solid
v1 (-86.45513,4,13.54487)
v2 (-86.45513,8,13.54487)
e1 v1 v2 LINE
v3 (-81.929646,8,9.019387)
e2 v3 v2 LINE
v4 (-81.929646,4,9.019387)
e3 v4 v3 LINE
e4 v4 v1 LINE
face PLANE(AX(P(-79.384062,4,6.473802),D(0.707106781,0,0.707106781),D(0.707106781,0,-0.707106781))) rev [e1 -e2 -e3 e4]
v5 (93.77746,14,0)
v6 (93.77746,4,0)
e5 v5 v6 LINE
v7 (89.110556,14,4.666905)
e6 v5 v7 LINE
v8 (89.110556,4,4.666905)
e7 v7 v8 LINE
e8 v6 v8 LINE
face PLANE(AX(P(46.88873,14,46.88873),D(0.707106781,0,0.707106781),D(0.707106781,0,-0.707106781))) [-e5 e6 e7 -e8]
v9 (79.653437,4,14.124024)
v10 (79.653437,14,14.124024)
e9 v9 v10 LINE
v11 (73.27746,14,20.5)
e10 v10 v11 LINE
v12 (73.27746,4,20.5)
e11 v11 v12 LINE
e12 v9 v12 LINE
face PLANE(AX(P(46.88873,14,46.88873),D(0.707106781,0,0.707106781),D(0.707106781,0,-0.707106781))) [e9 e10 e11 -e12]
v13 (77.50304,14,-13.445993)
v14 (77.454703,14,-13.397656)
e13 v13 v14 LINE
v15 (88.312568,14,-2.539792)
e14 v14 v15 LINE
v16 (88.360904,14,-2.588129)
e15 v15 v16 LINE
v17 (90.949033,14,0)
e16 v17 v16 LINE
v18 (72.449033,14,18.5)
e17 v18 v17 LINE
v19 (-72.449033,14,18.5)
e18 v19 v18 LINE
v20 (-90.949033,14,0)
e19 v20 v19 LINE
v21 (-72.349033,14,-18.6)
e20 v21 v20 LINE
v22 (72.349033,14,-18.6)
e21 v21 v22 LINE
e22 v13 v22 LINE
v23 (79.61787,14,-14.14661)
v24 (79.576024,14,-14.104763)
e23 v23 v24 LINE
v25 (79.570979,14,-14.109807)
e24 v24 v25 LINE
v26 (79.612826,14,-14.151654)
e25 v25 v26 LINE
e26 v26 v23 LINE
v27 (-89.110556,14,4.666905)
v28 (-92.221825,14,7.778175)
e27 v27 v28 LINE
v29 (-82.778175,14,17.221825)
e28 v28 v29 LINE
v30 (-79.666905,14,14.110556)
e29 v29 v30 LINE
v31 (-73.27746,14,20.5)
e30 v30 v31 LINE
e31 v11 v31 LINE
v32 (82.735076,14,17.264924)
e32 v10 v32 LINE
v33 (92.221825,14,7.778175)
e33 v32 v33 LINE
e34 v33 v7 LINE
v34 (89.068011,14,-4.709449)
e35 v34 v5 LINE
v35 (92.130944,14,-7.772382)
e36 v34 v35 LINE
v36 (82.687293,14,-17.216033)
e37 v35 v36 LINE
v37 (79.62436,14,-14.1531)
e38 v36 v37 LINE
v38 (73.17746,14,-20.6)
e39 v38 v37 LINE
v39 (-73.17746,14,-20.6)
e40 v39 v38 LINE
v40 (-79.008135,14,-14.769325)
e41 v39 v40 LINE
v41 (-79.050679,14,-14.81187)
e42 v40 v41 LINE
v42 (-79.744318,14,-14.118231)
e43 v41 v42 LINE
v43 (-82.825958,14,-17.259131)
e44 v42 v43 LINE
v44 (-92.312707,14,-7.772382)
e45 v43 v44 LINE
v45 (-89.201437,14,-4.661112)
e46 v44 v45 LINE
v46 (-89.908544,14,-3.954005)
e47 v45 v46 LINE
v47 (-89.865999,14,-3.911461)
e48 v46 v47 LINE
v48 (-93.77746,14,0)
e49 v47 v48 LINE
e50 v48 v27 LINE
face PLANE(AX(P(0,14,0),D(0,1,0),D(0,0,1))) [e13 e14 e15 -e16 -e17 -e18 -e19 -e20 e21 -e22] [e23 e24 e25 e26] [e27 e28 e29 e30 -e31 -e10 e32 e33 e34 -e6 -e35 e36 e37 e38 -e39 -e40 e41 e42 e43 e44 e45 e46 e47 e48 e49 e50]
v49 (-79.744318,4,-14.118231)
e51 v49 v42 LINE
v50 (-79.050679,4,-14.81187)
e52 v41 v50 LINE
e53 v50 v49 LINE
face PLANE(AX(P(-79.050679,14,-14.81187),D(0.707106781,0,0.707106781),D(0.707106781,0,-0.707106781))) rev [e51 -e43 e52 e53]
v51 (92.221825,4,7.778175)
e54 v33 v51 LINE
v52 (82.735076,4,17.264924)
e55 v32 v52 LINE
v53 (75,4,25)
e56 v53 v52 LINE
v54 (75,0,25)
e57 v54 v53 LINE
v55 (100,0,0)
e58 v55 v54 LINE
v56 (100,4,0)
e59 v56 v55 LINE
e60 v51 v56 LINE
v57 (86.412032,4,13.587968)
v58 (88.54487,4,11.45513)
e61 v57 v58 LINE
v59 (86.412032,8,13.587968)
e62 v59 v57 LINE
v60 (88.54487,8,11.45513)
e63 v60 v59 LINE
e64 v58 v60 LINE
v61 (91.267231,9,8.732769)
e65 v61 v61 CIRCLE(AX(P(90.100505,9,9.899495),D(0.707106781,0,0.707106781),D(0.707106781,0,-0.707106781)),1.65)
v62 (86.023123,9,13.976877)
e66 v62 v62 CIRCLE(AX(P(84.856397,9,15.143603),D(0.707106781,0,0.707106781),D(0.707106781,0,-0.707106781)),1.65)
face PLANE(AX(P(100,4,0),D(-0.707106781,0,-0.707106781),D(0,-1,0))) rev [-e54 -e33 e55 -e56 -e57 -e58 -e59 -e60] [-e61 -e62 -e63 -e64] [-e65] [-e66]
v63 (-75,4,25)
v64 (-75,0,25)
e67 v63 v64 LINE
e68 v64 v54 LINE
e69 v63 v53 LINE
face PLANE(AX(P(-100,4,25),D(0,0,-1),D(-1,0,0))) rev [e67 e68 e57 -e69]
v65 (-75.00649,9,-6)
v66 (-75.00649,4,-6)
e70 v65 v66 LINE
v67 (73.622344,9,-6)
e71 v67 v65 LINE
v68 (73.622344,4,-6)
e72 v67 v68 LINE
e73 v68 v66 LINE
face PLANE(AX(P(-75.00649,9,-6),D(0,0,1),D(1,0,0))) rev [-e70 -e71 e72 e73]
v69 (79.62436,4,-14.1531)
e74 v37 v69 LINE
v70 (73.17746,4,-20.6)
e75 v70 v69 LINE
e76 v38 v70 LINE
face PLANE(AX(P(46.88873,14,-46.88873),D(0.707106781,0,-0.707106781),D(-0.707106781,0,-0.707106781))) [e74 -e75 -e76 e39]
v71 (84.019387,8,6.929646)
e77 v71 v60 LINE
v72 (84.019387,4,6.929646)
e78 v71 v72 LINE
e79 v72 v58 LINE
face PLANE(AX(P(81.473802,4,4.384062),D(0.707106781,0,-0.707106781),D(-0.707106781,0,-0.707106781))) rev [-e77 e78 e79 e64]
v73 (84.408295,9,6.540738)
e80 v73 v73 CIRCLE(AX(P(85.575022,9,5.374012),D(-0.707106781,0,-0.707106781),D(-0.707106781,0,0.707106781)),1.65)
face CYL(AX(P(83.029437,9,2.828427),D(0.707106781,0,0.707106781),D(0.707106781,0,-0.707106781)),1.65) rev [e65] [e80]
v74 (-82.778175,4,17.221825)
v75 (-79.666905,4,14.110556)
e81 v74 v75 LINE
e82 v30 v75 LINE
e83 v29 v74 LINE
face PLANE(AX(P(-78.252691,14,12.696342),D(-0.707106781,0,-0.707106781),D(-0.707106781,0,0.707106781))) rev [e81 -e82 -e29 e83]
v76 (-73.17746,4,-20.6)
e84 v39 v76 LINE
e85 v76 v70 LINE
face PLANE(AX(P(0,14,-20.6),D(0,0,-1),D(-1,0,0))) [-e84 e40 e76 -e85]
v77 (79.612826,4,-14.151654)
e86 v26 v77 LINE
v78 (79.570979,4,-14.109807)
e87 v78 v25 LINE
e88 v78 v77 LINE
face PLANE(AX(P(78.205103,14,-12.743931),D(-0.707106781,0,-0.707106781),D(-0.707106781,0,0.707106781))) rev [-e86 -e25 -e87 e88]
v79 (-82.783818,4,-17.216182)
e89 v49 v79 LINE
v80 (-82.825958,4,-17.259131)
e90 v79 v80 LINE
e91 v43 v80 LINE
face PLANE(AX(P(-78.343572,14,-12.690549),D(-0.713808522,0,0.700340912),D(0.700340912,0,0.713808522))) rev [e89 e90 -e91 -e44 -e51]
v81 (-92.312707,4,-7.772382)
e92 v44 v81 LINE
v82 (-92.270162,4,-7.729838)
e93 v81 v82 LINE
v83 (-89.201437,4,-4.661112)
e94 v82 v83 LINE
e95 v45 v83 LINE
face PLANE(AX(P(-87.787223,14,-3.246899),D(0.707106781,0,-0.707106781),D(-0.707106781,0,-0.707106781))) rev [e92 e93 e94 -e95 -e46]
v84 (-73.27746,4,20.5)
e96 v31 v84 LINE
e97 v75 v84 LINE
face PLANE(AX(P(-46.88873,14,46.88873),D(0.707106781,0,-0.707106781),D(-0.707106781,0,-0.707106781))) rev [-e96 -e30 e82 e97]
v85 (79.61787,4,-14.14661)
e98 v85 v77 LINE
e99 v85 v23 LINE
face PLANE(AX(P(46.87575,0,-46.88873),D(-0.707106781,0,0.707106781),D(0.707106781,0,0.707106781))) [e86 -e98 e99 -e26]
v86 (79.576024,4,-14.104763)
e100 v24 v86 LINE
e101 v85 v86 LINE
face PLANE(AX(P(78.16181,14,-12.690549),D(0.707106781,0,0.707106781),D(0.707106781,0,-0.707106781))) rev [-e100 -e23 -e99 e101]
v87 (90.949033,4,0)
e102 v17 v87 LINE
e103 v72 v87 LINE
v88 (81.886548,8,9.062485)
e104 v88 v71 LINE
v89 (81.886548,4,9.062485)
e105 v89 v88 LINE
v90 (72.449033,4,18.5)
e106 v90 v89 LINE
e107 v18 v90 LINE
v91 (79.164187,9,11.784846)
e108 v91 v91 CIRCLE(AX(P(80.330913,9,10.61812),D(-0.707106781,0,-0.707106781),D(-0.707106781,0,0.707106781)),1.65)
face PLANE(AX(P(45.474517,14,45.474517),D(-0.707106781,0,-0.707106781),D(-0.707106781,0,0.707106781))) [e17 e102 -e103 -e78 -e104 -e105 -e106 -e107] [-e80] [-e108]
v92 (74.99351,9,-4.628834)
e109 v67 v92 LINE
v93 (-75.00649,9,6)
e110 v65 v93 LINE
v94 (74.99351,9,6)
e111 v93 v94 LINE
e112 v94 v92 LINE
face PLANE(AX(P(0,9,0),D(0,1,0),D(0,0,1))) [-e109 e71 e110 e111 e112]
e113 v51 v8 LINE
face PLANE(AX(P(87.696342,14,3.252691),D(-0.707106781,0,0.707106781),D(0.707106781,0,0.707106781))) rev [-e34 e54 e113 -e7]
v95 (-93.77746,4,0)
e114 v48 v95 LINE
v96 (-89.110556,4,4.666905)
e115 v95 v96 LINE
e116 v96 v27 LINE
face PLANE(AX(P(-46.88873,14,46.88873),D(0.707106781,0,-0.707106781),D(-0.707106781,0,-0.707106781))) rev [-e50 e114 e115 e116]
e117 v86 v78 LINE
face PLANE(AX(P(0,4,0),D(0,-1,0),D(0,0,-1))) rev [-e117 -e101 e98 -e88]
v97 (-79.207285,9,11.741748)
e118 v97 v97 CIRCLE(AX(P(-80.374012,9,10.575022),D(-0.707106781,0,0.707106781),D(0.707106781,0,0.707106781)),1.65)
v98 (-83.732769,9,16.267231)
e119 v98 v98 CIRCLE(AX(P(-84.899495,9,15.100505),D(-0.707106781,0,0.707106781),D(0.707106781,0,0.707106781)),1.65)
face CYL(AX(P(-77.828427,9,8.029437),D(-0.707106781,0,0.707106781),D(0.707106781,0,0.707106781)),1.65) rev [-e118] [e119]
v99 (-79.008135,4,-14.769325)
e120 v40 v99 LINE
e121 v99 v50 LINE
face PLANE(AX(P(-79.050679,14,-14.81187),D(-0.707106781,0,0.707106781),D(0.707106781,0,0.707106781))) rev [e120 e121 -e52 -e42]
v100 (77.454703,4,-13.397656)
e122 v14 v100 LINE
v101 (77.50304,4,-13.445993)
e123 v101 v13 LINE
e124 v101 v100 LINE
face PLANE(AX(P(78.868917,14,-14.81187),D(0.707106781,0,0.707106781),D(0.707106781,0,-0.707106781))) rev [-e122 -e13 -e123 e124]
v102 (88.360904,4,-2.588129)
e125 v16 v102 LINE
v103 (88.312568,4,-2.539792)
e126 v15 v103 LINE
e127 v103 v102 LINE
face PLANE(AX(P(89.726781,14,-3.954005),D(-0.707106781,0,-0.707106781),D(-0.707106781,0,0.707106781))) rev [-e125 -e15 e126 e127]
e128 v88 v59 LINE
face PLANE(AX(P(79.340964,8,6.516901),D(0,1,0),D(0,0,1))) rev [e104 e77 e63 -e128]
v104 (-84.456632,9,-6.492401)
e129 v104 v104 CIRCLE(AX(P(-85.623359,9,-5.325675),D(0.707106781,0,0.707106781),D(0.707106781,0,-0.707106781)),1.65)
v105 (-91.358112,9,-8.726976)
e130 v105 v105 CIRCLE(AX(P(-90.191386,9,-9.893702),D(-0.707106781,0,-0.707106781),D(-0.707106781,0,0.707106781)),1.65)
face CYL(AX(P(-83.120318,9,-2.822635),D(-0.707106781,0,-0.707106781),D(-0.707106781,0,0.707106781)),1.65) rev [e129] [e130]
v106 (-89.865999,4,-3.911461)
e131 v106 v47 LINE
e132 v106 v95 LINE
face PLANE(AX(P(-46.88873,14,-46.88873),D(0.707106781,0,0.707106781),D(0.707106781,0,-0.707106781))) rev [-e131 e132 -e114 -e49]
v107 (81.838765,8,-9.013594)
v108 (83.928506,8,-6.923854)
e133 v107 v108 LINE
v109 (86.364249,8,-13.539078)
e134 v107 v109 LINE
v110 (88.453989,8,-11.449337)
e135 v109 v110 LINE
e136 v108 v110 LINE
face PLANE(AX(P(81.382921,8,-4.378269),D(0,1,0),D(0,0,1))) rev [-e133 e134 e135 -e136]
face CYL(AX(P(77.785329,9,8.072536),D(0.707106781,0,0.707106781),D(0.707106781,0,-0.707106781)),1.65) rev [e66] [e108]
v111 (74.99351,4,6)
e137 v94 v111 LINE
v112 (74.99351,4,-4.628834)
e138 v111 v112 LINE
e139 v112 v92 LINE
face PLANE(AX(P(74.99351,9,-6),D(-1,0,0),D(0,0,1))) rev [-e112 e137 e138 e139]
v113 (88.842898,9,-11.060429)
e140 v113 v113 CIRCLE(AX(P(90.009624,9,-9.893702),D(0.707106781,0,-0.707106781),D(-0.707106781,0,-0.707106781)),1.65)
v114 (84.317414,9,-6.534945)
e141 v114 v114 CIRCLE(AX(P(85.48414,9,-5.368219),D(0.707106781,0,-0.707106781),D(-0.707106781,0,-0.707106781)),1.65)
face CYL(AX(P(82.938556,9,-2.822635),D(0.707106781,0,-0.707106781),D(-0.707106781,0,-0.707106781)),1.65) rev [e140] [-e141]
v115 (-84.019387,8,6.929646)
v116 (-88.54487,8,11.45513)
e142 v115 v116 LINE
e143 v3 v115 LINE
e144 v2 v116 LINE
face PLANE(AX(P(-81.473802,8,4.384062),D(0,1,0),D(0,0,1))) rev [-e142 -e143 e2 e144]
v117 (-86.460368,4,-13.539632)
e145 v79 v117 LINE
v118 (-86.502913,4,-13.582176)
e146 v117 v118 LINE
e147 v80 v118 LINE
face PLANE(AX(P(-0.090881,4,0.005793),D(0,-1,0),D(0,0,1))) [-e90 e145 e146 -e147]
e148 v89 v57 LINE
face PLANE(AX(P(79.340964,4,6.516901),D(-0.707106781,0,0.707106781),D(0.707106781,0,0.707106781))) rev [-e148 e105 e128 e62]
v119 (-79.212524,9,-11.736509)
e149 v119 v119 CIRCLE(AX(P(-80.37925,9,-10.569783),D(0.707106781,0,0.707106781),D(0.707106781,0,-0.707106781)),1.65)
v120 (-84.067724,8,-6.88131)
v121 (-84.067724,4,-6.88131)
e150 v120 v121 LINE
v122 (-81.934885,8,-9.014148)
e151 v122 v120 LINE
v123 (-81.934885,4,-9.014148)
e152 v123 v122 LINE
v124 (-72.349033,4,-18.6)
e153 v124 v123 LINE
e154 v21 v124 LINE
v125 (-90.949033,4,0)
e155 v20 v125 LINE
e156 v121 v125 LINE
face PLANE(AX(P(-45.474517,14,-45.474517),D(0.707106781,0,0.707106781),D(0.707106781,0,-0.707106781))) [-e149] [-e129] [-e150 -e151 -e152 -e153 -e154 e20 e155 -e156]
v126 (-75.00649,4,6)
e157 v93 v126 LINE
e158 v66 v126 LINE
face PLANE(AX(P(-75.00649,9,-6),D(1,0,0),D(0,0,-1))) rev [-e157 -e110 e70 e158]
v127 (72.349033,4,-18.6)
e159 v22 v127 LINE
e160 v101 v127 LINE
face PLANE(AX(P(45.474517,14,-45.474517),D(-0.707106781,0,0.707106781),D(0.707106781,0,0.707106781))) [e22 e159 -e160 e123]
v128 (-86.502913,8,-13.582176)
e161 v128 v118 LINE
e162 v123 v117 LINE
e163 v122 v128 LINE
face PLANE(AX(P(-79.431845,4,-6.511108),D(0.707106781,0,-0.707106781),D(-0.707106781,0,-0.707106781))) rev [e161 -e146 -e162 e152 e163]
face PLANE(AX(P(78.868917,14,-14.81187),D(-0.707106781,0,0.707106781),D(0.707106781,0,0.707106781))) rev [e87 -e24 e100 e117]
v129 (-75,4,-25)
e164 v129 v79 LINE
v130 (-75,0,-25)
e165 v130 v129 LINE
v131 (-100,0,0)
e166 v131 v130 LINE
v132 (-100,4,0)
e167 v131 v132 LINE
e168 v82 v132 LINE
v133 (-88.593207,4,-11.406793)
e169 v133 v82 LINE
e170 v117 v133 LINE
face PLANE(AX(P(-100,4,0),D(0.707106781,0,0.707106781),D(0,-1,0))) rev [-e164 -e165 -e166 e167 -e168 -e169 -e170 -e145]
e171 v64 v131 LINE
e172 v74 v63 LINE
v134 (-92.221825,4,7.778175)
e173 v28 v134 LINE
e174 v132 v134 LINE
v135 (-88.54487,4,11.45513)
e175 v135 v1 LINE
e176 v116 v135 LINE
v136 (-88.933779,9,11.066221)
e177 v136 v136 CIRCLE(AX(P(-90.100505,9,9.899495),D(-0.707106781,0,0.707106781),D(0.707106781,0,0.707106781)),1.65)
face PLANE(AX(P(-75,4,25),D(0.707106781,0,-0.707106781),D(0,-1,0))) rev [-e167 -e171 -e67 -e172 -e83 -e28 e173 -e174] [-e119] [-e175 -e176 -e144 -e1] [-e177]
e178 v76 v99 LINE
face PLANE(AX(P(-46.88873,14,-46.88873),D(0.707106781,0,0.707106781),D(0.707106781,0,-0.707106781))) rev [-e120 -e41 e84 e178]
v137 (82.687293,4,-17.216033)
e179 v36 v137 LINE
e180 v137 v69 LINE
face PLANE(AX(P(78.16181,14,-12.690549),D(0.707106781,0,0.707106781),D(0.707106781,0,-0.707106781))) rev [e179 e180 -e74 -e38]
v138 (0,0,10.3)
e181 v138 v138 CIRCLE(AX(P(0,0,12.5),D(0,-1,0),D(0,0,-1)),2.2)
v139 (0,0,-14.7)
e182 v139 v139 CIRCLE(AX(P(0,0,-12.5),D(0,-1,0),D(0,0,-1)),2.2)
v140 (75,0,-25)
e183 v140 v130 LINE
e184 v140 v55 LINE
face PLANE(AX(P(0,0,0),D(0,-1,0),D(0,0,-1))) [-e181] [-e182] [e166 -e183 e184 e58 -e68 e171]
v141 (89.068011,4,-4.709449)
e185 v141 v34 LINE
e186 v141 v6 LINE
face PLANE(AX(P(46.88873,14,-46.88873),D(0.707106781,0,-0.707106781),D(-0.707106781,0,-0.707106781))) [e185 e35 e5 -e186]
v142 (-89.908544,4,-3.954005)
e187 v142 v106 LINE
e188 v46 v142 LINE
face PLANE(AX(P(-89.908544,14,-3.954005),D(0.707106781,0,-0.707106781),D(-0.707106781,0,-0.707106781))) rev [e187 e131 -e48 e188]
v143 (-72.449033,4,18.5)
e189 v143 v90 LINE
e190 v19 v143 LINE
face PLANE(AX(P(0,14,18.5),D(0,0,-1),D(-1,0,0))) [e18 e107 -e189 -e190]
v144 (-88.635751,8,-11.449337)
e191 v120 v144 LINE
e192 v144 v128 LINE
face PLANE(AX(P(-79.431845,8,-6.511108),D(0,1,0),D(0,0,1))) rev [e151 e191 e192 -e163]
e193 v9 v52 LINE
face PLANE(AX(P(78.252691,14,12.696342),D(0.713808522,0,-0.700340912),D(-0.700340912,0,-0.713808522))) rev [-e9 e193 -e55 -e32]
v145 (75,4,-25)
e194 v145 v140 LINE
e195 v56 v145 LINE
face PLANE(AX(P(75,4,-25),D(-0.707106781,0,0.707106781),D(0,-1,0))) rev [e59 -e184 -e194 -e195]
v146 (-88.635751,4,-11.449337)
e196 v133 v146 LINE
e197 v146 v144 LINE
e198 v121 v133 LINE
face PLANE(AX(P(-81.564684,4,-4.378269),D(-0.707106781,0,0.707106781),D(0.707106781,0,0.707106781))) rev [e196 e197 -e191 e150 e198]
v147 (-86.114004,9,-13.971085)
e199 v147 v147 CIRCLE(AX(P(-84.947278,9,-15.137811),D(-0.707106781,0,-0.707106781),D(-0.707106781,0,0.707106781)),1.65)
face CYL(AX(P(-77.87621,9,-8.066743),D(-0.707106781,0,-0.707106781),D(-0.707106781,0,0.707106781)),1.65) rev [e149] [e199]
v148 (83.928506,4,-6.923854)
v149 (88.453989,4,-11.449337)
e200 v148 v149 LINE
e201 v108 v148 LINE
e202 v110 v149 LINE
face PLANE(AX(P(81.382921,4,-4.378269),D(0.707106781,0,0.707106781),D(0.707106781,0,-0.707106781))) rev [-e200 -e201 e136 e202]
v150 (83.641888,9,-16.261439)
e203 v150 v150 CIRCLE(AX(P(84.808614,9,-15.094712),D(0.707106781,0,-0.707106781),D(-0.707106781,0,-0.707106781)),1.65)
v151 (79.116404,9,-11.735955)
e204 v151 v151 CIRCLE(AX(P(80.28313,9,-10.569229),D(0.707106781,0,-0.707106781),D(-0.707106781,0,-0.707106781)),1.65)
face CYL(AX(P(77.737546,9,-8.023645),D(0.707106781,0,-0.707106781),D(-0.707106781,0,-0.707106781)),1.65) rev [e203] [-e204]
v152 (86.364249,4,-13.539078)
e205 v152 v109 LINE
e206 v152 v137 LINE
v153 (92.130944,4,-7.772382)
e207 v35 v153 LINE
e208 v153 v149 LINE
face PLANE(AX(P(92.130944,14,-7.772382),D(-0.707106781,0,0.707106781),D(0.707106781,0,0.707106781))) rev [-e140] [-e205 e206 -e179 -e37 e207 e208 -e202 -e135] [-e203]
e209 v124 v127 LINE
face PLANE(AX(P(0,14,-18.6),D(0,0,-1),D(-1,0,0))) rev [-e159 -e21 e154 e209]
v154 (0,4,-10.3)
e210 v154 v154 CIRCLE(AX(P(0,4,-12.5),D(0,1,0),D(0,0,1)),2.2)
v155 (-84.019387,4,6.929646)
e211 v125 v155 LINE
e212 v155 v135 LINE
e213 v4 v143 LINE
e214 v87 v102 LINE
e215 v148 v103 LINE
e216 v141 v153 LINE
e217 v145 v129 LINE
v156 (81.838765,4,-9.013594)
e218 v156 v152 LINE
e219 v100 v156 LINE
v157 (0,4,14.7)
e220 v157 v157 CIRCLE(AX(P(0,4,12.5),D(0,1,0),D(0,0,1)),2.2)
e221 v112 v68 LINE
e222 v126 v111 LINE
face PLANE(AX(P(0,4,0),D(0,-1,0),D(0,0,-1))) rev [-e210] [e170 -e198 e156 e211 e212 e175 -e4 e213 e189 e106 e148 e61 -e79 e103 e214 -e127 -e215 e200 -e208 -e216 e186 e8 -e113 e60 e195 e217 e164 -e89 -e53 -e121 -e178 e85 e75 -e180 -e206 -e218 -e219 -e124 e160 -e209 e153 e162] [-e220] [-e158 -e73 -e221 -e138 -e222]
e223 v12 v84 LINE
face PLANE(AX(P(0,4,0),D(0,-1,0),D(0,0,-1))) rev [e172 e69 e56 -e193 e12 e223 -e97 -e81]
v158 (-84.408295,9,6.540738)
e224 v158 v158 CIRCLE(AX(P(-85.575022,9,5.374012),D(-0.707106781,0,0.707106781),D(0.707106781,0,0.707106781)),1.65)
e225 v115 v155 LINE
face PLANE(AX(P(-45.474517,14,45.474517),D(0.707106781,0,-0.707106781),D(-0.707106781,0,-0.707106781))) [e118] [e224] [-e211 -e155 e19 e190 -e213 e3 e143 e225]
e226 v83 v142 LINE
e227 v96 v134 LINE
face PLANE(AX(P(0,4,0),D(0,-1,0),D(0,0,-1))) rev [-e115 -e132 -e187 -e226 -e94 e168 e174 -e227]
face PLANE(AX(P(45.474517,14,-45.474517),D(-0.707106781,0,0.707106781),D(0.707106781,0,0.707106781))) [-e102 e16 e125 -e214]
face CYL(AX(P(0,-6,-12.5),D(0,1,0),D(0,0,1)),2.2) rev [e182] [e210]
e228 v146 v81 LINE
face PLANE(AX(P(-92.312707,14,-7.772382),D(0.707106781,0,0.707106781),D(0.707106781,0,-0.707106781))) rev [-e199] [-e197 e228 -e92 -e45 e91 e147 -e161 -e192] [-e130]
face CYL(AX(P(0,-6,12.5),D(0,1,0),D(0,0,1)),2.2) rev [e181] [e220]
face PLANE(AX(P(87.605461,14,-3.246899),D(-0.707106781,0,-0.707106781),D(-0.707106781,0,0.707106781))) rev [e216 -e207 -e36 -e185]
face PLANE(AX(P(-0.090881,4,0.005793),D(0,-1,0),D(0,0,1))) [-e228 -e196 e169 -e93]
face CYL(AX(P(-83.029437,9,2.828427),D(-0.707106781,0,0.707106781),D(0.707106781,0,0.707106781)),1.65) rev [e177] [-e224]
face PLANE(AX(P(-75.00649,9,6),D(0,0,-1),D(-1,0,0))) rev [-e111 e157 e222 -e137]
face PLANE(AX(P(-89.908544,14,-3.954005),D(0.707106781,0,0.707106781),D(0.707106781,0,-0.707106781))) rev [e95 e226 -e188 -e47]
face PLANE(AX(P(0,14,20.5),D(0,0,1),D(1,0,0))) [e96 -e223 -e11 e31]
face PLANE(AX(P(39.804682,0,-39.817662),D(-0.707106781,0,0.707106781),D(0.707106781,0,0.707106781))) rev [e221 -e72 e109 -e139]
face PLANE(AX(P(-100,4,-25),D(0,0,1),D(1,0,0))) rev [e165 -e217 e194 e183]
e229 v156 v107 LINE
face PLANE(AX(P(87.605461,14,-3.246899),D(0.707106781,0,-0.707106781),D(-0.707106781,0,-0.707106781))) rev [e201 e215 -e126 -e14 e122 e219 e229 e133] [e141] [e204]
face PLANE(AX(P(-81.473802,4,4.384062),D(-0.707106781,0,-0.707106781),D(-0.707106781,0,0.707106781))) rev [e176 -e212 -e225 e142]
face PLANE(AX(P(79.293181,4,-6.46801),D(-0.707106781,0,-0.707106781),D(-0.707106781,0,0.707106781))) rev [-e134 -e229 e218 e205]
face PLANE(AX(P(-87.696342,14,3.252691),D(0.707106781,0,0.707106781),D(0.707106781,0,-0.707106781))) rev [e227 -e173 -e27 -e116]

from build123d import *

# Parameters (mm, degrees)
SKIZZE1_W                       = 200
SKIZZE1_H                       = 50
AUFSATZ_LINEAR_AUSTRAGEN1_DEPTH = 4
FASE1_SIZE                      = 25
AUFSATZ_LINEAR_AUSTRAGEN2_DEPTH = 10
SKIZZE3_W                       = 15.35533906
SKIZZE3_H                       = 10
SCHNITT_LINEAR_AUSTRAGEN1_DEPTH = 10
SKIZZE4_W                       = 15.35533906
SKIZZE4_H                       = 10
SCHNITT_LINEAR_AUSTRAGEN2_DEPTH = 10
SKIZZE5_W                       = 150
SKIZZE5_H                       = 12
AUFSATZ_LINEAR_AUSTRAGEN3_DEPTH = 5
AUFSATZ_LINEAR_AUSTRAGEN4_DEPTH = 10
AUFSATZ_LINEAR_AUSTRAGEN5_DEPTH = 10
SKIZZE11_R                      = 1.65
SKIZZE11_W                      = 2.95533906
SKIZZE11_H                      = 4
SCHNITT_LINEAR_AUSTRAGEN7_DEPTH = 10
SKIZZE12_R                      = 2.2
SCHNITT_LINEAR_AUSTRAGEN8_DEPTH = 10
AUFSATZ_LINEAR_AUSTRAGEN6_DEPTH = 10
SKIZZE8_R                       = 1.65
SKIZZE8_W                       = 3.016289267
SKIZZE8_H                       = 4
SCHNITT_LINEAR_AUSTRAGEN9_DEPTH = 10
KREISMUSTER1_START              = 56.301499416
KREISMUSTER1_OUTLINE_R          = 1.65
KREISMUSTER1_DEPTH              = 0.969560509
KREISMUSTER1_START_2            = 64.310678119
KREISMUSTER1_2_OUTLINE_W        = 0.949011964
KREISMUSTER1_2_OUTLINE_H        = 10
KREISMUSTER1_2_OUTLINE_R        = 1.65
KREISMUSTER1_2_OUTLINE_W_2      = 1.050988037
KREISMUSTER1_2_OUTLINE_W_3      = 2.955339059
KREISMUSTER1_2_OUTLINE_H_2      = 4
KREISMUSTER1_2_DEPTH            = 1.990821297
KREISMUSTER1_START_3            = 66.301499416
KREISMUSTER1_3_OUTLINE_R        = 1.65
KREISMUSTER1_3_OUTLINE_W        = 2.955339059
KREISMUSTER1_3_OUTLINE_H        = 4
KREISMUSTER1_3_DEPTH            = 0.009178703
KREISMUSTER1_START_4            = 64.242319383
KREISMUSTER1_4_OUTLINE_R        = 1.65
KREISMUSTER1_4_DEPTH            = 6.4
AUFSATZ_LINEAR_AUSTRAGEN7_DEPTH = 10
KREISMUSTER2_COUNT              = 2


# Read off the part's stored shape, not the designer's step: Kreismuster1
with BuildPart() as part:
    # Skizze1 → Aufsatz-Linear austragen1 (new body)
    with BuildSketch(Plane(origin=(0, 0, 0), x_dir=(1, 0, 0), z_dir=(0, 1, 0))):
        Rectangle(SKIZZE1_W, SKIZZE1_H)
    extrude(amount=AUFSATZ_LINEAR_AUSTRAGEN1_DEPTH)

    # Fase1
    fase1_edges = [part.edges().sort_by_distance(p)[0] for p in [
        (-100, 2, -25),
        (-100, 2, 25),
        (100, 2, -25),
        (100, 2, 25),
    ]]
    chamfer(fase1_edges, length=FASE1_SIZE - 0.0001)  # a hair under: the kernel refuses the full size

    # Skizze2 → Aufsatz-Linear austragen2 (add)
    with BuildSketch(Plane(origin=(0, 4, 0), x_dir=(1, 0, 0), z_dir=(0, 1, 0))):
        Polygon((-73.177460326, 20.6), (-93.777460326, 0), (-73.277460326, -20.5), (73.277460326, -20.5), (93.777460326, 0), (73.177460326, 20.6), align=None)
        Polygon((90.949033201, 0), (72.349033201, 18.6), (-72.349033201, 18.6), (-90.949033201, 0), (-72.449033201, -18.5), (72.449033201, -18.5), align=None, mode=Mode.SUBTRACT)
    extrude(amount=AUFSATZ_LINEAR_AUSTRAGEN2_DEPTH)

    # Skizze3 → Schnitt-Linear austragen1 (cut)
    with BuildSketch(Plane(origin=(-46.888730163, 0, 46.888730163), x_dir=(0.7071067811865476, 0, 0.7071067811865476), z_dir=(-0.7071067811865476, 0, 0.7071067811865476))):
        with Locations((-53.033008589, 9)):
            Rectangle(SKIZZE3_W, SKIZZE3_H)
    extrude(amount=-SCHNITT_LINEAR_AUSTRAGEN1_DEPTH, mode=Mode.SUBTRACT)

    # Skizze4 → Schnitt-Linear austragen2 (cut)
    with BuildSketch(Plane(origin=(46.888730163, 0, 46.888730163), x_dir=(0.7071067811865475, 0, -0.7071067811865477), z_dir=(0.7071067811865477, 0, 0.7071067811865475))):
        with Locations((53.033008589, 9)):
            Rectangle(SKIZZE4_W, SKIZZE4_H)
    extrude(amount=-SCHNITT_LINEAR_AUSTRAGEN2_DEPTH, mode=Mode.SUBTRACT)

    # Skizze5 → Aufsatz-Linear austragen3 (add)
    with BuildSketch(Plane(origin=(0, 4, 0), x_dir=(1, 0, 0), z_dir=(0, 1, 0))):
        with Locations((-0.006490323, 0)):
            Rectangle(SKIZZE5_W, SKIZZE5_H)
    extrude(amount=AUFSATZ_LINEAR_AUSTRAGEN3_DEPTH)

    # Skizze6 → Aufsatz-Linear austragen4 (add)
    with BuildSketch(Plane(origin=(0, 4, 0), x_dir=(1, 0, 0), z_dir=(0, 1, 0))):
        Polygon((87.696342007, -3.252691193), (78.252691193, -12.696342007), (82.735076288, -17.264923712), (92.221825407, -7.778174593), align=None)
    aufsatz_linear_austragen4 = extrude(amount=AUFSATZ_LINEAR_AUSTRAGEN4_DEPTH)

    # Skizze10 → Aufsatz-Linear austragen5 (add)
    with BuildSketch(Plane(origin=(0, 4, 0), x_dir=(1, 0, 0), z_dir=(0, 1, 0))):
        Polygon((-87.696342007, -3.252691193), (-78.252691193, -12.696342007), (-82.778174593, -17.221825407), (-92.221825407, -7.778174593), align=None)
    extrude(amount=AUFSATZ_LINEAR_AUSTRAGEN5_DEPTH)

    # Skizze11 → Schnitt-Linear austragen7 (cut)
    with BuildSketch(Plane(origin=(-50, 0, 50), x_dir=(0.7071067811865465, 0, 0.7071067811865488), z_dir=(-0.7071067811865488, 0, 0.7071067811865465))):
        with Locations((-56.710678119, 9)):
            Circle(SKIZZE11_R)
        with Locations((-49.355339059, 9)):
            Circle(SKIZZE11_R)
        with Locations((-53.033008589, 6)):
            Rectangle(SKIZZE11_W, SKIZZE11_H)
    extrude(amount=-SCHNITT_LINEAR_AUSTRAGEN7_DEPTH, mode=Mode.SUBTRACT)

    # Skizze12 → Schnitt-Linear austragen8 (cut)
    with BuildSketch(Plane(origin=(0, 4, 0), x_dir=(1, 0, 0), z_dir=(0, 1, 0))):
        with Locations(Location((0, 12.5, 0), (0, 0, 270))):
            Circle(SKIZZE12_R)
        with Locations(Location((0, -12.5, 0), (0, 0, 270))):
            Circle(SKIZZE12_R)
    extrude(amount=-SCHNITT_LINEAR_AUSTRAGEN8_DEPTH, mode=Mode.SUBTRACT)

    # Skizze13 → Aufsatz-Linear austragen6 (add)
    with BuildSketch(Plane(origin=(0, 4, 0), x_dir=(1, 0, 0), z_dir=(0, 1, 0))):
        Polygon((89.817662351, -3.959797975), (88.403448789, -2.545584412), (87.69285367, -3.256179531), (89.107067232, -4.670393094), align=None)
        Polygon((-89.817662351, -3.959797975), (-88.403448789, -2.545584412), (-87.689553601, -3.2594796), (-89.103767163, -4.673693162), align=None)
        Polygon((78.959797975, -14.817662351), (77.545584412, -13.403448789), (78.257117259, -12.691915942), (79.671330821, -14.106129505), align=None)
        Polygon((-78.959797975, -14.817662351), (-77.545584412, -13.403448789), (-78.262212477, -12.686820723), (-79.67642604, -14.101034286), align=None)
    aufsatz_linear_austragen6 = extrude(amount=AUFSATZ_LINEAR_AUSTRAGEN6_DEPTH)

    # Skizze8 → Schnitt-Linear austragen9 (cut)
    with BuildSketch(Plane(origin=(50, 0, 50), x_dir=(0.7071067811865488, 0, -0.7071067811865465), z_dir=(0.7071067811865465, 0, 0.7071067811865488))):
        with Locations((49.294388852, 9)):
            Circle(SKIZZE8_R)
        with Locations((56.710678119, 9)):
            Circle(SKIZZE8_R)
        with Locations((53.002533486, 6)):
            Rectangle(SKIZZE8_W, SKIZZE8_H)
    schnitt_linear_austragen9 = extrude(amount=-SCHNITT_LINEAR_AUSTRAGEN9_DEPTH, mode=Mode.SUBTRACT)

    # Kreismuster1 outline → Kreismuster1 (cut)
    with BuildSketch(Plane(origin=(0, 0, 0), x_dir=(0.707106781186546, 0, 0.707106781186549), z_dir=(0.707106781186549, 0, -0.707106781186546)).offset(KREISMUSTER1_START)):
        Polygon((46.29517232, -9), (46.29517232, -14), (59.650511379, -14), (59.650511379, -4), (54.450511379, -4), (54.450511379, -8), (51.49517232, -8), (51.49517232, -4), (46.29517232, -4), align=None)
        with BuildLine():
            Line((47.64517232, -9), (50.94517232, -9))
            ThreePointArc((50.94517232, -9), (49.29517232, -10.65), (47.64517232, -9))
        make_face(mode=Mode.SUBTRACT)
        with Locations((56.650511379, -9)):
            Circle(KREISMUSTER1_OUTLINE_R, mode=Mode.SUBTRACT)
    extrude(amount=KREISMUSTER1_DEPTH, mode=Mode.SUBTRACT)

    # Kreismuster1 2 outline → Kreismuster1 2 (cut)
    with BuildSketch(Plane(origin=(0, 0, 0), x_dir=(0.707106781186546, 0, 0.707106781186549), z_dir=(0.707106781186549, 0, -0.707106781186546)).offset(KREISMUSTER1_START_2)):
        with Locations((45.820666338, -9)):
            Rectangle(KREISMUSTER1_2_OUTLINE_W, KREISMUSTER1_2_OUTLINE_H)
        with Locations((56.650511379, -9)):
            Circle(KREISMUSTER1_2_OUTLINE_R)
        with Locations((49.29517232, -9)):
            Circle(KREISMUSTER1_2_OUTLINE_R)
        with Locations((60.176005398, -9)):
            Rectangle(KREISMUSTER1_2_OUTLINE_W_2, KREISMUSTER1_2_OUTLINE_H)
        with Locations((52.972841849, -6)):
            Rectangle(KREISMUSTER1_2_OUTLINE_W_3, KREISMUSTER1_2_OUTLINE_H_2)
    extrude(amount=KREISMUSTER1_2_DEPTH, mode=Mode.SUBTRACT)

    # Kreismuster1 3 outline → Kreismuster1 3 (cut)
    with BuildSketch(Plane(origin=(0, 0, 0), x_dir=(0.707106781186546, 0, 0.707106781186549), z_dir=(0.707106781186549, 0, -0.707106781186546)).offset(KREISMUSTER1_START_3)):
        with Locations((56.650511379, -9)):
            Circle(KREISMUSTER1_3_OUTLINE_R)
        with Locations((49.29517232, -9)):
            Circle(KREISMUSTER1_3_OUTLINE_R)
        with Locations((52.972841849, -6)):
            Rectangle(KREISMUSTER1_3_OUTLINE_W, KREISMUSTER1_3_OUTLINE_H)
    extrude(amount=KREISMUSTER1_3_DEPTH, mode=Mode.SUBTRACT)

    # Kreismuster1 4 outline → Kreismuster1 4 (add)
    with BuildSketch(Plane(origin=(0, 0, 0), x_dir=(0.707106781186546, 0, 0.707106781186549), z_dir=(0.707106781186549, 0, -0.707106781186546)).offset(KREISMUSTER1_START_4)):
        Polygon((46.29517232, -9), (46.29517232, -14), (59.650511379, -14), (59.650511379, -4), (54.450511379, -4), (54.450511379, -8), (51.49517232, -8), (51.49517232, -4), (46.29517232, -4), align=None)
        with BuildLine():
            ThreePointArc((50.94517232, -9), (49.29517232, -10.65), (47.64517232, -9))
            ThreePointArc((47.64517232, -9), (49.29517232, -7.35), (50.94517232, -9))
        make_face(mode=Mode.SUBTRACT)
        with Locations((56.650511379, -9)):
            Circle(KREISMUSTER1_4_OUTLINE_R, mode=Mode.SUBTRACT)
    extrude(amount=KREISMUSTER1_4_DEPTH)

    # Skizze14 → Aufsatz-Linear austragen7 (add)
    with BuildSketch(Plane(origin=(0, 4, 0), x_dir=(1, 0, 0), z_dir=(0, 1, 0))):
        Polygon((88.396958465, 2.552074735), (89.804681705, 3.959797975), (89.061520937, 4.702958742), (87.653797698, 3.295235503), align=None)
        Polygon((77.539094089, 13.409939112), (78.946817328, 14.817662351), (79.612825848, 14.151653831), (78.205102609, 12.743930592), align=None)
    extrude(amount=AUFSATZ_LINEAR_AUSTRAGEN7_DEPTH)

    # Kreismuster2: Aufsatz-Linear austragen4, Aufsatz-Linear austragen6, Schnitt-Linear austragen9 ×2 about axis
    kreismuster2_axis = Axis((-0.045440618, 0, 0.002896308), (0, 1, 0))
    add([aufsatz_linear_austragen4.rotate(kreismuster2_axis, i * 360 / KREISMUSTER2_COUNT) for i in range(1, KREISMUSTER2_COUNT)])
    add([aufsatz_linear_austragen6.rotate(kreismuster2_axis, i * 360 / KREISMUSTER2_COUNT) for i in range(1, KREISMUSTER2_COUNT)])
    add([schnitt_linear_austragen9.rotate(kreismuster2_axis, i * 360 / KREISMUSTER2_COUNT) for i in range(1, KREISMUSTER2_COUNT)], mode=Mode.SUBTRACT)


solid = part.part
